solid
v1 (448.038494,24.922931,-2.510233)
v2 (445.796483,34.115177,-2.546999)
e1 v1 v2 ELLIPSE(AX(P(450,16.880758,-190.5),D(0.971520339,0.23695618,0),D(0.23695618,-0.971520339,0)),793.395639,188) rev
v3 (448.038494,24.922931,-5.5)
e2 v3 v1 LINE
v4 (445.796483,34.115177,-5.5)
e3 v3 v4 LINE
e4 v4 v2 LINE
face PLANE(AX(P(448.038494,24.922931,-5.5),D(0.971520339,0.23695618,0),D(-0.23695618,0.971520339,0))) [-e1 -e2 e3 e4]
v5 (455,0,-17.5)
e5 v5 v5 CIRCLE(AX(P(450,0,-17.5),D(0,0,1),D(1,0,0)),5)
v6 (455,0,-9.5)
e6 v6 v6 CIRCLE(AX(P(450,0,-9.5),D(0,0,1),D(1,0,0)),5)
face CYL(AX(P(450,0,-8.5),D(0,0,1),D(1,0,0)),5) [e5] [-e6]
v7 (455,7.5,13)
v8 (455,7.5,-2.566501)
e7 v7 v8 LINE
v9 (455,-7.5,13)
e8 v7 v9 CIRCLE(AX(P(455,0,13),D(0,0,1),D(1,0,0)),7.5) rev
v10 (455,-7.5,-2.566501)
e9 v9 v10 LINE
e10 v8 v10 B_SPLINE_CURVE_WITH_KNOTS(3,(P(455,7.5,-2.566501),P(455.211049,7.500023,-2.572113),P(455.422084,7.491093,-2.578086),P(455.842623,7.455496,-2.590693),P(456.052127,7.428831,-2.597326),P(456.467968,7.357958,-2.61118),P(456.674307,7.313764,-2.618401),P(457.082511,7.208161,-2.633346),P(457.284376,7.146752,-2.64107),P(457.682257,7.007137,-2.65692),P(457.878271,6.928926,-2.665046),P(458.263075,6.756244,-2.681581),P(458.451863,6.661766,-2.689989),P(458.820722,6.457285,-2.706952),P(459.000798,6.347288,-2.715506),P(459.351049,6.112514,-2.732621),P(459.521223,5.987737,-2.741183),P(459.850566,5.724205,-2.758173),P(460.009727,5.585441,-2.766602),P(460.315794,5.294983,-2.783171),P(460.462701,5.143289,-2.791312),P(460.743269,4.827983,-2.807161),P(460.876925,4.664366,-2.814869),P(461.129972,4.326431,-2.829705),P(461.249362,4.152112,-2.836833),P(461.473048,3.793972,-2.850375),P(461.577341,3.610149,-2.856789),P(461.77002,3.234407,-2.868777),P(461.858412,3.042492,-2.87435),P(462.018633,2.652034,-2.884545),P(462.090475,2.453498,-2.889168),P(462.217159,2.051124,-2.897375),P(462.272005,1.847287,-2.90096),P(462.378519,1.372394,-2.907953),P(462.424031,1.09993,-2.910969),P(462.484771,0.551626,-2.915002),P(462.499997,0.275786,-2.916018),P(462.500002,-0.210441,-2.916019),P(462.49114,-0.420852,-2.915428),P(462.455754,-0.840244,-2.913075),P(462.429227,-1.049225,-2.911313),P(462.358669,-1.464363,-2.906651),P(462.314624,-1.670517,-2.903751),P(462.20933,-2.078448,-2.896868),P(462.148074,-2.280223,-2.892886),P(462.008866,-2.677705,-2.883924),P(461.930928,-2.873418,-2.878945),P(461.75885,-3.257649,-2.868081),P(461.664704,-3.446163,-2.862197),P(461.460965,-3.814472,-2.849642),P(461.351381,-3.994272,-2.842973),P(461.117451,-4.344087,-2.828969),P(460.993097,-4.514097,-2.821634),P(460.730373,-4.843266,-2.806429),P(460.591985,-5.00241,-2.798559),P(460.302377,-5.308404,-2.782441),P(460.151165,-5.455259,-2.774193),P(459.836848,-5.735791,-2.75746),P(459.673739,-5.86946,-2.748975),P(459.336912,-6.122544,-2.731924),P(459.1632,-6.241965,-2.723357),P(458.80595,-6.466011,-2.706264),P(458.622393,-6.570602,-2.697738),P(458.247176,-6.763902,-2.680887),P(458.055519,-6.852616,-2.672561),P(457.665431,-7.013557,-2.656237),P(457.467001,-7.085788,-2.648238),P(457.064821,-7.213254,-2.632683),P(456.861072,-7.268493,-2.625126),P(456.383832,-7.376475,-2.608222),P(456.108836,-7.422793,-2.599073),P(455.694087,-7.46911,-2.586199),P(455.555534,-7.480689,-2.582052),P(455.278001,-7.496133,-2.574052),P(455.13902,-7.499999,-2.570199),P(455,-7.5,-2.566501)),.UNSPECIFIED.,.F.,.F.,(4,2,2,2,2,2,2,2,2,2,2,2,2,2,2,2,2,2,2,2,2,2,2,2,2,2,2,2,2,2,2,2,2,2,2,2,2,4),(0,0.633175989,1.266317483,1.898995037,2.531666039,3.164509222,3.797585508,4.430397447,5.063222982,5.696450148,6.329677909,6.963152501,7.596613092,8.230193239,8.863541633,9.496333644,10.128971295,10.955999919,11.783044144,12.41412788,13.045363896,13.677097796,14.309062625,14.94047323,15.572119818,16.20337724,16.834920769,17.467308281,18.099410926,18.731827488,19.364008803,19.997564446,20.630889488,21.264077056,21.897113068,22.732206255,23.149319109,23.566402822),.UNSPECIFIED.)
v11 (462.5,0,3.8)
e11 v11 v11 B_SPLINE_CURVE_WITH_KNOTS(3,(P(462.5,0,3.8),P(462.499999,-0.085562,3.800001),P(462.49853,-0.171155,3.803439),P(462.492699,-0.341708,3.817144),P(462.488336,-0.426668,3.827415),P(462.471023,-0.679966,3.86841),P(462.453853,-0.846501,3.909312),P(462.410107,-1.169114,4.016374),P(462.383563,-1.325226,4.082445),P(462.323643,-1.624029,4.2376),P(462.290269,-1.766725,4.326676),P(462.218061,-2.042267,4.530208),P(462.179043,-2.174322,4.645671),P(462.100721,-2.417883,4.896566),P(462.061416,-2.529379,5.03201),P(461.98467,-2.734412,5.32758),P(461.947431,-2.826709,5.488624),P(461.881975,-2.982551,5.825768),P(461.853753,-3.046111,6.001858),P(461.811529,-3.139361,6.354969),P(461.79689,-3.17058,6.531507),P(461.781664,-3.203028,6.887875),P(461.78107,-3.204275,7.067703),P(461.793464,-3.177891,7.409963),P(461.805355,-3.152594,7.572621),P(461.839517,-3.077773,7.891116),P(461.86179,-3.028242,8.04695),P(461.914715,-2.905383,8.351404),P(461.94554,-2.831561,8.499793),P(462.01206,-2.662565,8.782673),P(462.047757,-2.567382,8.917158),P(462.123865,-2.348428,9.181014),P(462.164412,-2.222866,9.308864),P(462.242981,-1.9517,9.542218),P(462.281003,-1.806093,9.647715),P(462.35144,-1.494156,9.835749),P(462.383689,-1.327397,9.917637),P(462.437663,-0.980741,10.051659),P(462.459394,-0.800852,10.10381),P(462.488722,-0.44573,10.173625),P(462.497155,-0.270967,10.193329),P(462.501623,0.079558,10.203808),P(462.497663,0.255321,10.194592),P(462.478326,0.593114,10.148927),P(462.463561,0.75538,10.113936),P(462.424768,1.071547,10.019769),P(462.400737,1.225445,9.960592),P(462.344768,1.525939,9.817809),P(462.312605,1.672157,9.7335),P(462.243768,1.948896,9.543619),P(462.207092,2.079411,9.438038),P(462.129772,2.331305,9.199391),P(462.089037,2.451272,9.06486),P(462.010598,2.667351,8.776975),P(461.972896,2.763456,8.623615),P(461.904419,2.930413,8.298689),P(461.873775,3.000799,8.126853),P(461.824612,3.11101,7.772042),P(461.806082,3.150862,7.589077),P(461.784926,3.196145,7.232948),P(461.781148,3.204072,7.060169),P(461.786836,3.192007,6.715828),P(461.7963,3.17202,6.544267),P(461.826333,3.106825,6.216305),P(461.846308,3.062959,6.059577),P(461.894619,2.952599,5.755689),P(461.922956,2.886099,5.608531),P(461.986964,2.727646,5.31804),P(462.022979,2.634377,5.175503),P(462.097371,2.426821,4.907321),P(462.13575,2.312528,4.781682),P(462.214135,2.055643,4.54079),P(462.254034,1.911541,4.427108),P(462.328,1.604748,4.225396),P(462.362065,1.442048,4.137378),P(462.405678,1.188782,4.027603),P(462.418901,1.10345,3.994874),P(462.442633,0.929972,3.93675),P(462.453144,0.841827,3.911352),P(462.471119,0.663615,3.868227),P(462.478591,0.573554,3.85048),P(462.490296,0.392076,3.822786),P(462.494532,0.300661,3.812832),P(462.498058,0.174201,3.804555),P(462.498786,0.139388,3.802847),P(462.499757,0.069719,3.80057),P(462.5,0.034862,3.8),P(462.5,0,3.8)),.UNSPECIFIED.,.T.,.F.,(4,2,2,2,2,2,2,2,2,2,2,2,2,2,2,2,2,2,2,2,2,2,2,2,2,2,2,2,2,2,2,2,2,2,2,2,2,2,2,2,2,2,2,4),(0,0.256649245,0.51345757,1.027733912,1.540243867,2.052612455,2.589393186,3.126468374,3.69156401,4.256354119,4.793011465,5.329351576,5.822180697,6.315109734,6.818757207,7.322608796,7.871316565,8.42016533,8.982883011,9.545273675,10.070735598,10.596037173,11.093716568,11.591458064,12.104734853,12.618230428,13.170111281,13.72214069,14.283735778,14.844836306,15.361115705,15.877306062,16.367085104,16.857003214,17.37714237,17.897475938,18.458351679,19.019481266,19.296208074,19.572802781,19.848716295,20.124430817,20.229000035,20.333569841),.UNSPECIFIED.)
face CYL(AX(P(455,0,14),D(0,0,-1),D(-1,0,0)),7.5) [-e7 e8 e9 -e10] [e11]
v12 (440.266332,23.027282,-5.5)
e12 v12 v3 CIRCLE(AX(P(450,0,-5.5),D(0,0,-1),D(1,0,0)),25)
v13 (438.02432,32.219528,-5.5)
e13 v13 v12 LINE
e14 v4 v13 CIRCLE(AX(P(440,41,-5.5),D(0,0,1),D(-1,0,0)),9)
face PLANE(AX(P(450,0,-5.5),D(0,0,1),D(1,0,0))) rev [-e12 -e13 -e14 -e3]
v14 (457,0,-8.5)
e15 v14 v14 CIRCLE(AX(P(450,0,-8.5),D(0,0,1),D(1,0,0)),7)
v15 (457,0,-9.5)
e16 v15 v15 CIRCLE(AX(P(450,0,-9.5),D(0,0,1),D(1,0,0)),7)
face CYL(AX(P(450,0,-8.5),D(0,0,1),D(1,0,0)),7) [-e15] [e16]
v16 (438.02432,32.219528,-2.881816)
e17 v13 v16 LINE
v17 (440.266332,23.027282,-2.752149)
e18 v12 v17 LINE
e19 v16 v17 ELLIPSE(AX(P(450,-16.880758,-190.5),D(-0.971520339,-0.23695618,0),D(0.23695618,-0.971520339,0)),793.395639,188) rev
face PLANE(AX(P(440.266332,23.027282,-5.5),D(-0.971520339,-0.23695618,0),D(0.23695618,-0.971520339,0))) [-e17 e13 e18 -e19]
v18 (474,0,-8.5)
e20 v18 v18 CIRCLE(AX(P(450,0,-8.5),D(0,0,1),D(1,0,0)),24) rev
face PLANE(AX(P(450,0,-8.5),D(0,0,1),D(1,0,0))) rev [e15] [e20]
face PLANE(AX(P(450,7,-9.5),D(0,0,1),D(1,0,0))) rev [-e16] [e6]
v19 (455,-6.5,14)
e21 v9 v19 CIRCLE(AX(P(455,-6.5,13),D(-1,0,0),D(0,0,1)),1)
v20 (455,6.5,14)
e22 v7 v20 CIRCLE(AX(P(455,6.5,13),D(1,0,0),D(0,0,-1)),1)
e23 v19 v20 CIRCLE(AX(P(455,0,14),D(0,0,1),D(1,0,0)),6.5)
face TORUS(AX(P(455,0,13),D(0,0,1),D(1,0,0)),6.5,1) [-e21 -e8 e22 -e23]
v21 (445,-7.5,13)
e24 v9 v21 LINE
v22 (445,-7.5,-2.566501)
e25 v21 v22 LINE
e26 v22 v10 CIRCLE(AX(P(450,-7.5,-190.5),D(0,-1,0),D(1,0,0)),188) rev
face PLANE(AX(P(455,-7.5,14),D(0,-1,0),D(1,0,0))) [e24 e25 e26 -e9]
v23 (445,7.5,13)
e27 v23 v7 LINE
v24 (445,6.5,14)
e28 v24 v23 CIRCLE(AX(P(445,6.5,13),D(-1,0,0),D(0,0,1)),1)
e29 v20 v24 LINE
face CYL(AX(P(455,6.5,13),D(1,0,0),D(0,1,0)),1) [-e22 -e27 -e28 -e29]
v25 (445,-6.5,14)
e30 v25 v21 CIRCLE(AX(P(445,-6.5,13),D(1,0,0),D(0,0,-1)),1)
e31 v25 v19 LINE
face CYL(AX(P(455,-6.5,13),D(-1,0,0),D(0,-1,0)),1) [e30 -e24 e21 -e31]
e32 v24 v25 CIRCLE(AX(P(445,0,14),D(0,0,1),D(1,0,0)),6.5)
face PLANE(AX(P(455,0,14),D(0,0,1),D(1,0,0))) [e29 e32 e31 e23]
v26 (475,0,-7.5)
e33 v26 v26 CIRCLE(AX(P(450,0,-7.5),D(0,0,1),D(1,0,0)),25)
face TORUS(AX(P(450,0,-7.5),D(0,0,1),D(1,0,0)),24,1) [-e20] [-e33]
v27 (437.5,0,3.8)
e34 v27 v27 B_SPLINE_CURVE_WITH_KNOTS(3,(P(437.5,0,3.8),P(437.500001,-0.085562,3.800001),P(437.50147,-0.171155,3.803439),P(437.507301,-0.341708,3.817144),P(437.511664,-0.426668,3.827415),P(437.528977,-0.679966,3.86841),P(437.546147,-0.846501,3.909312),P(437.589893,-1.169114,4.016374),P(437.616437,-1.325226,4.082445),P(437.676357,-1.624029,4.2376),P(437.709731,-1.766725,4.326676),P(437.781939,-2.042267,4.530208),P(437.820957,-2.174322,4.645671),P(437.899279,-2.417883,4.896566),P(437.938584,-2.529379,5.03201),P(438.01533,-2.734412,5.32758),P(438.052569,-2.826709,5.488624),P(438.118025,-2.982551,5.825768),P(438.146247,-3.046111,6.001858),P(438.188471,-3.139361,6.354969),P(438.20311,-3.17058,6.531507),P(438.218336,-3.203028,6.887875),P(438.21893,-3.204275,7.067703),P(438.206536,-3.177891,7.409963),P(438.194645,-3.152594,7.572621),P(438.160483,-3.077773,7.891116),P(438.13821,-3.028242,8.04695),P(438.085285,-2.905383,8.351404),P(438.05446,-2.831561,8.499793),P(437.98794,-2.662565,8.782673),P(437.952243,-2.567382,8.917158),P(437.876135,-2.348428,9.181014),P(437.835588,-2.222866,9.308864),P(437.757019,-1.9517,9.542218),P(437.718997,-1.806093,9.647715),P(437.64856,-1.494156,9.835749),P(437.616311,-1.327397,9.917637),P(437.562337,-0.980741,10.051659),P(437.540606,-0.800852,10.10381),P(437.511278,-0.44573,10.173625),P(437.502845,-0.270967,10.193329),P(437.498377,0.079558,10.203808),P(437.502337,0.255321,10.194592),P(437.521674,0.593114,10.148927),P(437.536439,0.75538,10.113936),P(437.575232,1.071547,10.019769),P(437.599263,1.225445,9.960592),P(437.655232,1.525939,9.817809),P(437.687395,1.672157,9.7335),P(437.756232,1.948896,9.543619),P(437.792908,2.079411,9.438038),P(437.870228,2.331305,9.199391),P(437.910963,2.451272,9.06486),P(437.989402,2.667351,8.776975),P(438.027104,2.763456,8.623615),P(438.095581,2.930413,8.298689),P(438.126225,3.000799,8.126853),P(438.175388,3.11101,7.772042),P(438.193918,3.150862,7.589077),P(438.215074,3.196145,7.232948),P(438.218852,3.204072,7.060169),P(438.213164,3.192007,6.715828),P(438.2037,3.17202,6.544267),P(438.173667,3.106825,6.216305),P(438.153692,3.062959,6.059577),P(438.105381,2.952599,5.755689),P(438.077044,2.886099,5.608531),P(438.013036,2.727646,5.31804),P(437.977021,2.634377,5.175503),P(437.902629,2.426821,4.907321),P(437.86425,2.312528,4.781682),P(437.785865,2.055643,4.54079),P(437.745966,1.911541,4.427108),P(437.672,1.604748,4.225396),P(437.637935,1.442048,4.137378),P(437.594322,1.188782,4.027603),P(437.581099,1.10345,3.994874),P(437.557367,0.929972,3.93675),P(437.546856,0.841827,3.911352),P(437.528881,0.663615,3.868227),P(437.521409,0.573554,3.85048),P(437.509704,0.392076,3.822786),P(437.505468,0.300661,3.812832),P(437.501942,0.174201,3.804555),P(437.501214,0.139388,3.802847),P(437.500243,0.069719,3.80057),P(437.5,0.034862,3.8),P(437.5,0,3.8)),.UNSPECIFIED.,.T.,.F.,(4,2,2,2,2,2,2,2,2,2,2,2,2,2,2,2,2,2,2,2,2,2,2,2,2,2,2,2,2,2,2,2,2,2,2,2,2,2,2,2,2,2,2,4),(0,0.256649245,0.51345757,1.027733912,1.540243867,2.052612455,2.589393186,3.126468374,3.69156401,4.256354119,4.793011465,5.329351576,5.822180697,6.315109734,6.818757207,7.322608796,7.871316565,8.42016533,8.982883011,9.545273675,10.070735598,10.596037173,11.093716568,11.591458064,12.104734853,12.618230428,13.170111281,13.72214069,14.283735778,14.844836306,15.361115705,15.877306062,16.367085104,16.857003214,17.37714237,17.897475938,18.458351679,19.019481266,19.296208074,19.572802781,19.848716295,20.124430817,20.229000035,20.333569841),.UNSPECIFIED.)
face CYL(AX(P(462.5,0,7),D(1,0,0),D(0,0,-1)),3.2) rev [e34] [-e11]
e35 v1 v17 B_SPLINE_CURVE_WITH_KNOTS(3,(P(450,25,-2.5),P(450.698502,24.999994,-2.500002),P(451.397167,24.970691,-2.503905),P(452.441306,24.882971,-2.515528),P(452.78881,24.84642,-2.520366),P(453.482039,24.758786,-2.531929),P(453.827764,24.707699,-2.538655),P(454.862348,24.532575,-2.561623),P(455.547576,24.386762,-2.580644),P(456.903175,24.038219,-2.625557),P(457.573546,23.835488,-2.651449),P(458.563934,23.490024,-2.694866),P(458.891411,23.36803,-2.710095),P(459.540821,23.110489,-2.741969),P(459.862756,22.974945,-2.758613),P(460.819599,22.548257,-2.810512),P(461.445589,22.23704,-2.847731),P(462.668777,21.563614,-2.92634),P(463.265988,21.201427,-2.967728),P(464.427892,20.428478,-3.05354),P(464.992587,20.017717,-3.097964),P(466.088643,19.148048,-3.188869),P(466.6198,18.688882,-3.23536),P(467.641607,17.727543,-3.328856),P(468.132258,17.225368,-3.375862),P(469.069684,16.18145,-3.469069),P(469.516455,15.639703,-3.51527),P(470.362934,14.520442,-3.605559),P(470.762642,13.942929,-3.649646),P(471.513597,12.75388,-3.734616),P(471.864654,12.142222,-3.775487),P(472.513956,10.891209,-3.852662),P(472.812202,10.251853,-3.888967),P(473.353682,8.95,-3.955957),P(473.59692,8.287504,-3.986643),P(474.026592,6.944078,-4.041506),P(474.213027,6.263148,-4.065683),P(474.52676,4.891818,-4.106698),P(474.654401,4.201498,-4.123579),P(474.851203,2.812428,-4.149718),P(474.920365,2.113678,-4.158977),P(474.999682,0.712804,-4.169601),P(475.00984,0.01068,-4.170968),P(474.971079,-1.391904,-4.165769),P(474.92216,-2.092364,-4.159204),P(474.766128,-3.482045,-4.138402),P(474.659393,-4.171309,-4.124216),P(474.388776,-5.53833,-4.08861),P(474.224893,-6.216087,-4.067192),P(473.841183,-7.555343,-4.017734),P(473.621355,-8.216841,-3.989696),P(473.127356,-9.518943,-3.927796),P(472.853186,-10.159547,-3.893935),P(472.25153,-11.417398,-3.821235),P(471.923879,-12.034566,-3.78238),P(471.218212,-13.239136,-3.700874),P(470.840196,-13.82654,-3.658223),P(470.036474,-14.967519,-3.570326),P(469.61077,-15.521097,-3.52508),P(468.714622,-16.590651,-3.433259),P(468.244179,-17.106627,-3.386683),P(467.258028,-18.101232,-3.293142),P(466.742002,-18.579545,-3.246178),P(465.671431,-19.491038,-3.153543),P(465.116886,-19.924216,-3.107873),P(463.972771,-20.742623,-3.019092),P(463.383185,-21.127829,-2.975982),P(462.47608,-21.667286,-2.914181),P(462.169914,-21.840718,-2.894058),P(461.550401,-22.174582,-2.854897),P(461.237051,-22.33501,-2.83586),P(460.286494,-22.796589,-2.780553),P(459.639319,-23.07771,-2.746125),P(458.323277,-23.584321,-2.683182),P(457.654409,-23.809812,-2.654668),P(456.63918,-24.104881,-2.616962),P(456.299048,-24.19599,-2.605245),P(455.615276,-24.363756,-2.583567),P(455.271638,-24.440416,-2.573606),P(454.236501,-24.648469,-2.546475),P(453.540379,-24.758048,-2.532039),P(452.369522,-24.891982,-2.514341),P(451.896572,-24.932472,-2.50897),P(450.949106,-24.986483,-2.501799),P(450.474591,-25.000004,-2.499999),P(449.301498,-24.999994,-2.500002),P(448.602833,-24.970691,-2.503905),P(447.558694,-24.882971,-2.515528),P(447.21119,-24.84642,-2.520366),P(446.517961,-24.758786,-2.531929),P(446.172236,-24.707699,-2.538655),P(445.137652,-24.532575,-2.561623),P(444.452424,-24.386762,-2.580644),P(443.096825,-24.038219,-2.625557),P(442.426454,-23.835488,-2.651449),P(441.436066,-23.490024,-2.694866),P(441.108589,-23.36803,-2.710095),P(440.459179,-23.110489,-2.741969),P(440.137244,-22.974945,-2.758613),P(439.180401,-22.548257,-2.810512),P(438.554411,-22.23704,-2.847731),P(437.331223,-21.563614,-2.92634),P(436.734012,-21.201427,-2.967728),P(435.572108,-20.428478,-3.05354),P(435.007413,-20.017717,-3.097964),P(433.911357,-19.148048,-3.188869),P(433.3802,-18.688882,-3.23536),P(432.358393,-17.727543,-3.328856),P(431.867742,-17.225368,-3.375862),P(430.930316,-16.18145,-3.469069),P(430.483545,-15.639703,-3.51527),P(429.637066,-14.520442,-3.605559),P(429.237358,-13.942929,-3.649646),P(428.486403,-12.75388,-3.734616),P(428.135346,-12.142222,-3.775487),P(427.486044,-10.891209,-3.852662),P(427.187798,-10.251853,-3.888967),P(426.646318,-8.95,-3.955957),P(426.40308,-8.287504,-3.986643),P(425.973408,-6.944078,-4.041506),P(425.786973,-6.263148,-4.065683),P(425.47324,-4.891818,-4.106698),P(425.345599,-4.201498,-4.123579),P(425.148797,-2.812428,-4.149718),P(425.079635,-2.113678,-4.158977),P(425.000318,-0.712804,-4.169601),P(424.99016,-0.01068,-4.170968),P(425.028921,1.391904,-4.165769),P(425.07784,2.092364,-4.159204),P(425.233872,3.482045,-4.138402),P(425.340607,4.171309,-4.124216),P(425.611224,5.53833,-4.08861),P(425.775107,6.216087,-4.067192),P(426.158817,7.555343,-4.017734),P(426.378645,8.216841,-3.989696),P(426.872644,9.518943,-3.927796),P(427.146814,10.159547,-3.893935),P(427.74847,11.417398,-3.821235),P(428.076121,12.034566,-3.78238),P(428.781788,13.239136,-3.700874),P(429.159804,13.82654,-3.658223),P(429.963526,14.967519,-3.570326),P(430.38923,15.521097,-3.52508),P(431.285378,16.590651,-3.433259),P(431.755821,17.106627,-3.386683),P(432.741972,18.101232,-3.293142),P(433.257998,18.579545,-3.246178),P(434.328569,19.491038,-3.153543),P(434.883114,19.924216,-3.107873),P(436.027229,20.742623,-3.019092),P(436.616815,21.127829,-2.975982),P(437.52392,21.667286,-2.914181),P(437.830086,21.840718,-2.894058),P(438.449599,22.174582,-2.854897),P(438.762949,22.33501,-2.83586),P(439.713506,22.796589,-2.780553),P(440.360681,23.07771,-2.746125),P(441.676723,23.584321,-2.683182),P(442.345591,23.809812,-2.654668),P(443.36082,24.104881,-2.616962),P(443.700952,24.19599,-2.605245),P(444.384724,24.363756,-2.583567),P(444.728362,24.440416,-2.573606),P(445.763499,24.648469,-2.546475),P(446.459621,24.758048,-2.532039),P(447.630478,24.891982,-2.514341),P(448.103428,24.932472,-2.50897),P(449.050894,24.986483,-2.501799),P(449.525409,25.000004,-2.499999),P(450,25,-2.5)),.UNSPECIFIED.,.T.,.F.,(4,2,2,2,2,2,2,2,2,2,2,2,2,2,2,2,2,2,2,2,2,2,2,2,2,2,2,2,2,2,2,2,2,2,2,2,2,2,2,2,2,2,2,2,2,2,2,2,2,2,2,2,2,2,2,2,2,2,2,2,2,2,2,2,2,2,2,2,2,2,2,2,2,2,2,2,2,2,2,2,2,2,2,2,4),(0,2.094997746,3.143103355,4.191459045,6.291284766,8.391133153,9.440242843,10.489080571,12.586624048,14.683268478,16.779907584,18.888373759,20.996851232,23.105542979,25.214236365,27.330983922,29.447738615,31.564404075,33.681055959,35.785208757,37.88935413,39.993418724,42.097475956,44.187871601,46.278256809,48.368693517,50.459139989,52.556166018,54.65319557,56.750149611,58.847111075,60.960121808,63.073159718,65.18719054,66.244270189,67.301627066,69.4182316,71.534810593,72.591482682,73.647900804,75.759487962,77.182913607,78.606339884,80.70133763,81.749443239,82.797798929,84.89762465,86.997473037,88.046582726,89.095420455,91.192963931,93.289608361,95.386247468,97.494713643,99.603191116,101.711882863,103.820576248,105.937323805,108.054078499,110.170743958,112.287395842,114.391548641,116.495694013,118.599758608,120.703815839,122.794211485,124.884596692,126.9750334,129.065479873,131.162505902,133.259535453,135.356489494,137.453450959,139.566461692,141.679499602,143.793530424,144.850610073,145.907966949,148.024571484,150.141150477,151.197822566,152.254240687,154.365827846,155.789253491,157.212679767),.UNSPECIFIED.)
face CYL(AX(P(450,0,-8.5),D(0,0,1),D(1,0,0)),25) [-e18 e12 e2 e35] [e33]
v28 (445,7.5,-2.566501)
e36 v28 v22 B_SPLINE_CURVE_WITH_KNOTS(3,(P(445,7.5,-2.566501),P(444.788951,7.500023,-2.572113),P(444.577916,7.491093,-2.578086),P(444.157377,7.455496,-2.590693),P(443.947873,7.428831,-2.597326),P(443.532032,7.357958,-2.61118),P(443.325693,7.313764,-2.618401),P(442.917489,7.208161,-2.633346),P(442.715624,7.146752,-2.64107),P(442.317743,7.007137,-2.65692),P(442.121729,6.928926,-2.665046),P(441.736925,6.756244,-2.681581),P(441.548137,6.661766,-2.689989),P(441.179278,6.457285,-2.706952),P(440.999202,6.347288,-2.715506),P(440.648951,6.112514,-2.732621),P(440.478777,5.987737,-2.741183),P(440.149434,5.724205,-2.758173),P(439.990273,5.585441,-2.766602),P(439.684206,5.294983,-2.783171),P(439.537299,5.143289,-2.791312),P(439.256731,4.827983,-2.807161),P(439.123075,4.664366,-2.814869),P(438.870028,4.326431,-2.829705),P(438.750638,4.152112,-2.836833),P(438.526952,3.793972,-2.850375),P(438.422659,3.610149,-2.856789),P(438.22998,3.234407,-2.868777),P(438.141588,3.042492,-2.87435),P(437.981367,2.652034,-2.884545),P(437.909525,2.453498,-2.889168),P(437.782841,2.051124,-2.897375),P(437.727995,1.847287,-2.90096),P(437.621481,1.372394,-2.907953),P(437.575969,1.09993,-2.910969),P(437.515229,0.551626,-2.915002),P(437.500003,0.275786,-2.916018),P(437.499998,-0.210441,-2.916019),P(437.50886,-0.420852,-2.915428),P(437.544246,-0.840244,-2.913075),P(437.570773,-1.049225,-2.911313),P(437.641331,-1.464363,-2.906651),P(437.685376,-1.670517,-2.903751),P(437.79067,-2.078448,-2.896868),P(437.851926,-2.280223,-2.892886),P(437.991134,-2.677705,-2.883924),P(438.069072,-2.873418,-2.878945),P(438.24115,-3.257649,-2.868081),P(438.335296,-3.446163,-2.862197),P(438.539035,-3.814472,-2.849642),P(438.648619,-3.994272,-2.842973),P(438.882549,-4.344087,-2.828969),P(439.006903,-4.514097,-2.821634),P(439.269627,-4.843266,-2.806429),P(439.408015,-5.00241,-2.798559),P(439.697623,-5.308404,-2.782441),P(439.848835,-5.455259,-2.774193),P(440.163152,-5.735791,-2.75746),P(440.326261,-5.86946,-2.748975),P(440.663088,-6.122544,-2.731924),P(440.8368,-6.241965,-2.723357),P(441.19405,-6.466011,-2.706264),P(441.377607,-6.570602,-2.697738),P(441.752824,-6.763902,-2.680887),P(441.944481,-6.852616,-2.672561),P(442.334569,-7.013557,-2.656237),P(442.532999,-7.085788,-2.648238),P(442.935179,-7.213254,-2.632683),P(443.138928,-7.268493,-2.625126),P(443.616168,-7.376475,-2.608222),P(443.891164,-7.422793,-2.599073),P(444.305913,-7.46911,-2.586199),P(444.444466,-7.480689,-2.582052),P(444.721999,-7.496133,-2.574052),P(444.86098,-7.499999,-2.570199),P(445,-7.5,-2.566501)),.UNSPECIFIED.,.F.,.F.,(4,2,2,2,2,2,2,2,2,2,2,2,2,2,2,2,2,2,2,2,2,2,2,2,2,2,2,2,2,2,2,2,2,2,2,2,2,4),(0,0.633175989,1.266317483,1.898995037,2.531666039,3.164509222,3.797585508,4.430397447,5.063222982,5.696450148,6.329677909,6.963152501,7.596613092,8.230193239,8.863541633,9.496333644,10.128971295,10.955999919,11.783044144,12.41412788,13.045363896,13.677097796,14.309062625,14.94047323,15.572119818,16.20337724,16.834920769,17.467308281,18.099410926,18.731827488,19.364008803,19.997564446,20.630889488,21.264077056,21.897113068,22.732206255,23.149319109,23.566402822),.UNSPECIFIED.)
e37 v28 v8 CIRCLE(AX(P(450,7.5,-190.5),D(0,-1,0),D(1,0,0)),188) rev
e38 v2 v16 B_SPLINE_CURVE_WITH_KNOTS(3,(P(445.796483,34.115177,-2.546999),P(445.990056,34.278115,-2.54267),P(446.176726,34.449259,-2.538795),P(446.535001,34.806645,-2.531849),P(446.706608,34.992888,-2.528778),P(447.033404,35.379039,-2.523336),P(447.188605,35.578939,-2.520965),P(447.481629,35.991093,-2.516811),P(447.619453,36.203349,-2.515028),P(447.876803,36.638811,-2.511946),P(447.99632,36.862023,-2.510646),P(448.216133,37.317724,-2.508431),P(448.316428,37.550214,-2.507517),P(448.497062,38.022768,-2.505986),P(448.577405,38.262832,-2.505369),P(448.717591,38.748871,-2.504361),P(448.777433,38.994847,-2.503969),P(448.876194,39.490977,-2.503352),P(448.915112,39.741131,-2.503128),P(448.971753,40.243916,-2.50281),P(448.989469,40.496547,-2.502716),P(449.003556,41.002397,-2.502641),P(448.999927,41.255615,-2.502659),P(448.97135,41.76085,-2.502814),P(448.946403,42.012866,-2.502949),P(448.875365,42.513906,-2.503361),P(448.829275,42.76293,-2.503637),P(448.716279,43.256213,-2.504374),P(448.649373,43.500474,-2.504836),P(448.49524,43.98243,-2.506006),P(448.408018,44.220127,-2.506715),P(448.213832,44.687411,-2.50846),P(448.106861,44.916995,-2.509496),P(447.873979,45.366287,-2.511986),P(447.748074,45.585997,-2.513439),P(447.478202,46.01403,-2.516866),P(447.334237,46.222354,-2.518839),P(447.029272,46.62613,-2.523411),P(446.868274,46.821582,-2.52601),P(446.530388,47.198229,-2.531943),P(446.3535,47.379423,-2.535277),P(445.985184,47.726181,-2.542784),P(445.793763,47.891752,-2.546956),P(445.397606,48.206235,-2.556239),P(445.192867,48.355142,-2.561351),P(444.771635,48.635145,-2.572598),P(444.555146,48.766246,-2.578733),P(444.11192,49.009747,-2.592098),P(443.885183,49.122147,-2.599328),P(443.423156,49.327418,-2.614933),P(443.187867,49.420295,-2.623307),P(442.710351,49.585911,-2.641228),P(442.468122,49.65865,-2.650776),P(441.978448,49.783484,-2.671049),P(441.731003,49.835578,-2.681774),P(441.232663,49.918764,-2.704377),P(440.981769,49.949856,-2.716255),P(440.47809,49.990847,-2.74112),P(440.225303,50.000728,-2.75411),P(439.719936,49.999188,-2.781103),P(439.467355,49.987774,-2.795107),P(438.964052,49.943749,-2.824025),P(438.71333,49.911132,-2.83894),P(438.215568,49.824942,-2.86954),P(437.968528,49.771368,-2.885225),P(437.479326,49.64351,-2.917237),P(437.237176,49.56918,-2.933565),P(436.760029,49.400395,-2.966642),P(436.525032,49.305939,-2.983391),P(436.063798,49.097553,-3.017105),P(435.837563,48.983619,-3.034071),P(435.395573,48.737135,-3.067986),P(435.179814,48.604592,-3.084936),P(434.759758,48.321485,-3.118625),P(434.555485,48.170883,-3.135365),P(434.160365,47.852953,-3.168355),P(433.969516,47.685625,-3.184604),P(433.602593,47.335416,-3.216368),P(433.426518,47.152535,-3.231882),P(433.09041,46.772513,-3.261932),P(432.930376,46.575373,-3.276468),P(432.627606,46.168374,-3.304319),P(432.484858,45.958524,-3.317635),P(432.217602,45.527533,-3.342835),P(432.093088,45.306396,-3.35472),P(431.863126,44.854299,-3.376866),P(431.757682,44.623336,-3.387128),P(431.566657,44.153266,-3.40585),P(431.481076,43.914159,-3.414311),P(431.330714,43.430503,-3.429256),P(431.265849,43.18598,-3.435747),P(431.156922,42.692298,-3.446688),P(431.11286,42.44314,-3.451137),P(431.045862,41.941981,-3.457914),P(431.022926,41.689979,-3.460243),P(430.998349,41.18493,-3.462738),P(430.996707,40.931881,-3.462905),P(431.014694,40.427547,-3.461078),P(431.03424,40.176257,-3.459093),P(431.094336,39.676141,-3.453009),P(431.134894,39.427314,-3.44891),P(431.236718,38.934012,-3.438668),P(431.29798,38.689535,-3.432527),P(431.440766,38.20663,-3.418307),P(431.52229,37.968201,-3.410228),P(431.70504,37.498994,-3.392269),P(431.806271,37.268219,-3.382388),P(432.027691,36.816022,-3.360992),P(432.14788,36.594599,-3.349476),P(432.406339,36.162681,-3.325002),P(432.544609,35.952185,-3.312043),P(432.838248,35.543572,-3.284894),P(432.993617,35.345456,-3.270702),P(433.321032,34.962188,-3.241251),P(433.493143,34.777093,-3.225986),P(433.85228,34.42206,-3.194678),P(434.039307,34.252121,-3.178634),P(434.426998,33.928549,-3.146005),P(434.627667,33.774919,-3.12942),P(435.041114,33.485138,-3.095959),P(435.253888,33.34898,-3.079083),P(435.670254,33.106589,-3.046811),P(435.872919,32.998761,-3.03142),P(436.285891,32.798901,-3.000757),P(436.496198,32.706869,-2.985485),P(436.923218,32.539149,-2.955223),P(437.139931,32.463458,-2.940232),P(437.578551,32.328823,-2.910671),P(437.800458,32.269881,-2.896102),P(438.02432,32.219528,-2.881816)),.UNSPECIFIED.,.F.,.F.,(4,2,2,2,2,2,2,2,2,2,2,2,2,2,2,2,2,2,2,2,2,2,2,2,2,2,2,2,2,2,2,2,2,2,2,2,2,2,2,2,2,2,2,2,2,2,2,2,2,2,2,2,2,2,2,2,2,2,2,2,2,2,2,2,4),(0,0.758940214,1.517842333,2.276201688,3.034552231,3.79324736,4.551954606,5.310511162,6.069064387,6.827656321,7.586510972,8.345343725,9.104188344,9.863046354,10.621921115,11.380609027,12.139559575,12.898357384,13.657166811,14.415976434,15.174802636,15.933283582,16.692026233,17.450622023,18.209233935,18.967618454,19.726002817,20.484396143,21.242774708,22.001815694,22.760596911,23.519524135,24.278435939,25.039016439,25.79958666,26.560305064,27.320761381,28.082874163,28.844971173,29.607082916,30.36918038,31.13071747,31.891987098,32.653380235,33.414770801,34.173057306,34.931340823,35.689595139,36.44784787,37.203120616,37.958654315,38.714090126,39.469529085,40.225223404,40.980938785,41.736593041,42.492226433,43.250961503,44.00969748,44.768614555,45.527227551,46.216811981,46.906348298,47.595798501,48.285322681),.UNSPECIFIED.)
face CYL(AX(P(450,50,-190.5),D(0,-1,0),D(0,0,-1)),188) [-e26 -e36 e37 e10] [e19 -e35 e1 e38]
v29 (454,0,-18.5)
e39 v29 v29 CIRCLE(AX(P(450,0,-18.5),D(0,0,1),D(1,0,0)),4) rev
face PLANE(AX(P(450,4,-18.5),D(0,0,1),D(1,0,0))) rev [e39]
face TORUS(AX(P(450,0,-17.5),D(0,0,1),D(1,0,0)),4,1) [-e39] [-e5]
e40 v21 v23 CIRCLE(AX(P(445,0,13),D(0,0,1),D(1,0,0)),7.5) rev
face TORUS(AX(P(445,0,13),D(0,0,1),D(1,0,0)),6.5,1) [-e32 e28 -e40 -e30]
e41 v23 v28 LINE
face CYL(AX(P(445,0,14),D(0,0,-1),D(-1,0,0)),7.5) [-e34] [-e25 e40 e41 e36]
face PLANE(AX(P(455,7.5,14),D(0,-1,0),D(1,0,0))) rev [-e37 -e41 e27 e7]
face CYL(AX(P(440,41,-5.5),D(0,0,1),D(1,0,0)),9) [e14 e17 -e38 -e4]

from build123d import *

# Parameters (mm, degrees)
AUFSATZ_LINEAR_START             = -2.5
SKIZZE2_R                        = 25
AUFSATZ_LINEAR_AUSTRAGEN1_DEPTH  = 6
AUFSATZ_LINEAR_START_2           = -5.5
AUFSATZ_LINEAR_AUSTRAGEN6_DEPTH  = 3
SCHNITT_LINEAR_AUSTRAGEN2_DEPTH  = 478.699958133
AUFSATZ_LINEAR_START_3           = -2.916019
AUFSATZ_LINEAR_AUSTRAGEN5_DEPTH  = 16.916019
SPIEGELN4_START                  = -2.916018908
SPIEGELN4_DEPTH                  = 16.916018908
F_6_4_6_4_DURCHMESSER_BOHRUNG1_D = 6.4
VERRUNDUNG2_R                    = 1


# Read off the part's stored shape, not the designer's step: Spiegeln4
with BuildPart() as part:
    # Skizze2 → Aufsatz-Linear austragen1 (new body)
    with BuildSketch(Plane.XY.offset(AUFSATZ_LINEAR_START)):
        with Locations((450, 0)):
            Circle(SKIZZE2_R)
    extrude(amount=-AUFSATZ_LINEAR_AUSTRAGEN1_DEPTH)

    # Skizze10 → Aufsatz-Linear austragen6 (add)
    with BuildSketch(Plane.XY.offset(AUFSATZ_LINEAR_START_2)):
        with BuildLine():
            Line((448.038494427, 24.922931126), (445.796483155, 34.115177342))
            ThreePointArc((445.796483155, 34.115177342), (437.867394378, 49.743683049), (438.024320445, 32.2195279))
            Line((438.024320445, 32.2195279), (440.266331717, 23.027281684))
            ThreePointArc((440.266331717, 23.027281684), (444.076095495, 24.28800847), (448.038494427, 24.922931126))
        make_face()
    extrude(amount=AUFSATZ_LINEAR_AUSTRAGEN6_DEPTH)

    # Skizze8 → Schnitt-Linear austragen2 (cut, symmetric)
    with BuildSketch(Plane(origin=(0, 0, 0), x_dir=(1, 0, 0), z_dir=(0, 1, 0))):
        with BuildLine():
            Line((475, 2.5), (450, 2.5))
            ThreePointArc((450, 2.5), (462.527846235, 2.917876468), (475, 4.169648205))
            Line((475, 4.169648205), (475, 2.5))
        make_face()
    schnitt_linear_austragen2 = extrude(amount=SCHNITT_LINEAR_AUSTRAGEN2_DEPTH, both=True, mode=Mode.SUBTRACT)

    # Spiegeln1: Schnitt-Linear austragen2 across plane
    add(schnitt_linear_austragen2.mirror(Plane(origin=(450, 0, 0), x_dir=(0, 0, 1), z_dir=(1, 0, 0))), mode=Mode.SUBTRACT)

    # Skizze3 → Aufsatz-Linear austragen5 (add)
    with BuildSketch(Plane.XY.offset(AUFSATZ_LINEAR_START_3)):
        with BuildLine():
            Line((450, 0), (462.5, 0))
            ThreePointArc((462.5, 0), (460.303300859, 5.303300859), (455, 7.5))
            Line((455, 7.5), (450, 7.5))
            Line((450, 7.5), (450, 0))
        make_face()
    extrude(amount=AUFSATZ_LINEAR_AUSTRAGEN5_DEPTH)

    # Spiegeln4 outline → Spiegeln4 (add)
    with BuildSketch(Plane.XY.offset(SPIEGELN4_START)):
        with BuildLine():
            ThreePointArc((455, -7.5), (460.303300859, -5.303300859), (462.5, 0))
            Line((462.5, 0), (450, 0))
            Line((450, 0), (450, 7.5))
            Line((450, 7.5), (445, 7.5))
            ThreePointArc((445, 7.5), (437.5, 0), (445, -7.5))
            Line((445, -7.5), (455, -7.5))
        make_face()
    extrude(amount=SPIEGELN4_DEPTH)

    # Skizze4 → Rotation1 (revolve)
    with BuildSketch(Plane(origin=(450, 0, 0), x_dir=(0, 0, -1), z_dir=(1, 0, 0)), mode=Mode.PRIVATE) as rotation1_sk:
        Polygon((9.5, 7), (8.5, 7), (8.5, 0), (18.5, 0), (18.5, 4), (18.5, 5), (9.5, 5), align=None)
    revolve(rotation1_sk.sketch.rotate(Axis((450, 0, -8.5), (0, 0, -1)), 90), axis=Axis((450, 0, -8.5), (0, 0, -1)))

    # Ø6.4 (6.4) Durchmesser Bohrung1 (through all)
    with Locations(Plane(origin=(462.5, 0, 0), x_dir=(0, 0, -1), z_dir=(1, 0, 0))):
        with Locations((-7, 0)):
            Hole(F_6_4_6_4_DURCHMESSER_BOHRUNG1_D / 2)

    # Verrundung2
    verrundung2_edges = [part.edges().sort_by_distance(p)[0] for p in [
        (437.5, 0, 14),
        (445, 0, -18.5),
        (425, 0, -8.5),
        (460.303300859, 5.303300859, 14),
        (450, 7.5, 14),
        (450, -7.5, 14),
    ]]
    fillet(verrundung2_edges, radius=VERRUNDUNG2_R)


solid = part.part
